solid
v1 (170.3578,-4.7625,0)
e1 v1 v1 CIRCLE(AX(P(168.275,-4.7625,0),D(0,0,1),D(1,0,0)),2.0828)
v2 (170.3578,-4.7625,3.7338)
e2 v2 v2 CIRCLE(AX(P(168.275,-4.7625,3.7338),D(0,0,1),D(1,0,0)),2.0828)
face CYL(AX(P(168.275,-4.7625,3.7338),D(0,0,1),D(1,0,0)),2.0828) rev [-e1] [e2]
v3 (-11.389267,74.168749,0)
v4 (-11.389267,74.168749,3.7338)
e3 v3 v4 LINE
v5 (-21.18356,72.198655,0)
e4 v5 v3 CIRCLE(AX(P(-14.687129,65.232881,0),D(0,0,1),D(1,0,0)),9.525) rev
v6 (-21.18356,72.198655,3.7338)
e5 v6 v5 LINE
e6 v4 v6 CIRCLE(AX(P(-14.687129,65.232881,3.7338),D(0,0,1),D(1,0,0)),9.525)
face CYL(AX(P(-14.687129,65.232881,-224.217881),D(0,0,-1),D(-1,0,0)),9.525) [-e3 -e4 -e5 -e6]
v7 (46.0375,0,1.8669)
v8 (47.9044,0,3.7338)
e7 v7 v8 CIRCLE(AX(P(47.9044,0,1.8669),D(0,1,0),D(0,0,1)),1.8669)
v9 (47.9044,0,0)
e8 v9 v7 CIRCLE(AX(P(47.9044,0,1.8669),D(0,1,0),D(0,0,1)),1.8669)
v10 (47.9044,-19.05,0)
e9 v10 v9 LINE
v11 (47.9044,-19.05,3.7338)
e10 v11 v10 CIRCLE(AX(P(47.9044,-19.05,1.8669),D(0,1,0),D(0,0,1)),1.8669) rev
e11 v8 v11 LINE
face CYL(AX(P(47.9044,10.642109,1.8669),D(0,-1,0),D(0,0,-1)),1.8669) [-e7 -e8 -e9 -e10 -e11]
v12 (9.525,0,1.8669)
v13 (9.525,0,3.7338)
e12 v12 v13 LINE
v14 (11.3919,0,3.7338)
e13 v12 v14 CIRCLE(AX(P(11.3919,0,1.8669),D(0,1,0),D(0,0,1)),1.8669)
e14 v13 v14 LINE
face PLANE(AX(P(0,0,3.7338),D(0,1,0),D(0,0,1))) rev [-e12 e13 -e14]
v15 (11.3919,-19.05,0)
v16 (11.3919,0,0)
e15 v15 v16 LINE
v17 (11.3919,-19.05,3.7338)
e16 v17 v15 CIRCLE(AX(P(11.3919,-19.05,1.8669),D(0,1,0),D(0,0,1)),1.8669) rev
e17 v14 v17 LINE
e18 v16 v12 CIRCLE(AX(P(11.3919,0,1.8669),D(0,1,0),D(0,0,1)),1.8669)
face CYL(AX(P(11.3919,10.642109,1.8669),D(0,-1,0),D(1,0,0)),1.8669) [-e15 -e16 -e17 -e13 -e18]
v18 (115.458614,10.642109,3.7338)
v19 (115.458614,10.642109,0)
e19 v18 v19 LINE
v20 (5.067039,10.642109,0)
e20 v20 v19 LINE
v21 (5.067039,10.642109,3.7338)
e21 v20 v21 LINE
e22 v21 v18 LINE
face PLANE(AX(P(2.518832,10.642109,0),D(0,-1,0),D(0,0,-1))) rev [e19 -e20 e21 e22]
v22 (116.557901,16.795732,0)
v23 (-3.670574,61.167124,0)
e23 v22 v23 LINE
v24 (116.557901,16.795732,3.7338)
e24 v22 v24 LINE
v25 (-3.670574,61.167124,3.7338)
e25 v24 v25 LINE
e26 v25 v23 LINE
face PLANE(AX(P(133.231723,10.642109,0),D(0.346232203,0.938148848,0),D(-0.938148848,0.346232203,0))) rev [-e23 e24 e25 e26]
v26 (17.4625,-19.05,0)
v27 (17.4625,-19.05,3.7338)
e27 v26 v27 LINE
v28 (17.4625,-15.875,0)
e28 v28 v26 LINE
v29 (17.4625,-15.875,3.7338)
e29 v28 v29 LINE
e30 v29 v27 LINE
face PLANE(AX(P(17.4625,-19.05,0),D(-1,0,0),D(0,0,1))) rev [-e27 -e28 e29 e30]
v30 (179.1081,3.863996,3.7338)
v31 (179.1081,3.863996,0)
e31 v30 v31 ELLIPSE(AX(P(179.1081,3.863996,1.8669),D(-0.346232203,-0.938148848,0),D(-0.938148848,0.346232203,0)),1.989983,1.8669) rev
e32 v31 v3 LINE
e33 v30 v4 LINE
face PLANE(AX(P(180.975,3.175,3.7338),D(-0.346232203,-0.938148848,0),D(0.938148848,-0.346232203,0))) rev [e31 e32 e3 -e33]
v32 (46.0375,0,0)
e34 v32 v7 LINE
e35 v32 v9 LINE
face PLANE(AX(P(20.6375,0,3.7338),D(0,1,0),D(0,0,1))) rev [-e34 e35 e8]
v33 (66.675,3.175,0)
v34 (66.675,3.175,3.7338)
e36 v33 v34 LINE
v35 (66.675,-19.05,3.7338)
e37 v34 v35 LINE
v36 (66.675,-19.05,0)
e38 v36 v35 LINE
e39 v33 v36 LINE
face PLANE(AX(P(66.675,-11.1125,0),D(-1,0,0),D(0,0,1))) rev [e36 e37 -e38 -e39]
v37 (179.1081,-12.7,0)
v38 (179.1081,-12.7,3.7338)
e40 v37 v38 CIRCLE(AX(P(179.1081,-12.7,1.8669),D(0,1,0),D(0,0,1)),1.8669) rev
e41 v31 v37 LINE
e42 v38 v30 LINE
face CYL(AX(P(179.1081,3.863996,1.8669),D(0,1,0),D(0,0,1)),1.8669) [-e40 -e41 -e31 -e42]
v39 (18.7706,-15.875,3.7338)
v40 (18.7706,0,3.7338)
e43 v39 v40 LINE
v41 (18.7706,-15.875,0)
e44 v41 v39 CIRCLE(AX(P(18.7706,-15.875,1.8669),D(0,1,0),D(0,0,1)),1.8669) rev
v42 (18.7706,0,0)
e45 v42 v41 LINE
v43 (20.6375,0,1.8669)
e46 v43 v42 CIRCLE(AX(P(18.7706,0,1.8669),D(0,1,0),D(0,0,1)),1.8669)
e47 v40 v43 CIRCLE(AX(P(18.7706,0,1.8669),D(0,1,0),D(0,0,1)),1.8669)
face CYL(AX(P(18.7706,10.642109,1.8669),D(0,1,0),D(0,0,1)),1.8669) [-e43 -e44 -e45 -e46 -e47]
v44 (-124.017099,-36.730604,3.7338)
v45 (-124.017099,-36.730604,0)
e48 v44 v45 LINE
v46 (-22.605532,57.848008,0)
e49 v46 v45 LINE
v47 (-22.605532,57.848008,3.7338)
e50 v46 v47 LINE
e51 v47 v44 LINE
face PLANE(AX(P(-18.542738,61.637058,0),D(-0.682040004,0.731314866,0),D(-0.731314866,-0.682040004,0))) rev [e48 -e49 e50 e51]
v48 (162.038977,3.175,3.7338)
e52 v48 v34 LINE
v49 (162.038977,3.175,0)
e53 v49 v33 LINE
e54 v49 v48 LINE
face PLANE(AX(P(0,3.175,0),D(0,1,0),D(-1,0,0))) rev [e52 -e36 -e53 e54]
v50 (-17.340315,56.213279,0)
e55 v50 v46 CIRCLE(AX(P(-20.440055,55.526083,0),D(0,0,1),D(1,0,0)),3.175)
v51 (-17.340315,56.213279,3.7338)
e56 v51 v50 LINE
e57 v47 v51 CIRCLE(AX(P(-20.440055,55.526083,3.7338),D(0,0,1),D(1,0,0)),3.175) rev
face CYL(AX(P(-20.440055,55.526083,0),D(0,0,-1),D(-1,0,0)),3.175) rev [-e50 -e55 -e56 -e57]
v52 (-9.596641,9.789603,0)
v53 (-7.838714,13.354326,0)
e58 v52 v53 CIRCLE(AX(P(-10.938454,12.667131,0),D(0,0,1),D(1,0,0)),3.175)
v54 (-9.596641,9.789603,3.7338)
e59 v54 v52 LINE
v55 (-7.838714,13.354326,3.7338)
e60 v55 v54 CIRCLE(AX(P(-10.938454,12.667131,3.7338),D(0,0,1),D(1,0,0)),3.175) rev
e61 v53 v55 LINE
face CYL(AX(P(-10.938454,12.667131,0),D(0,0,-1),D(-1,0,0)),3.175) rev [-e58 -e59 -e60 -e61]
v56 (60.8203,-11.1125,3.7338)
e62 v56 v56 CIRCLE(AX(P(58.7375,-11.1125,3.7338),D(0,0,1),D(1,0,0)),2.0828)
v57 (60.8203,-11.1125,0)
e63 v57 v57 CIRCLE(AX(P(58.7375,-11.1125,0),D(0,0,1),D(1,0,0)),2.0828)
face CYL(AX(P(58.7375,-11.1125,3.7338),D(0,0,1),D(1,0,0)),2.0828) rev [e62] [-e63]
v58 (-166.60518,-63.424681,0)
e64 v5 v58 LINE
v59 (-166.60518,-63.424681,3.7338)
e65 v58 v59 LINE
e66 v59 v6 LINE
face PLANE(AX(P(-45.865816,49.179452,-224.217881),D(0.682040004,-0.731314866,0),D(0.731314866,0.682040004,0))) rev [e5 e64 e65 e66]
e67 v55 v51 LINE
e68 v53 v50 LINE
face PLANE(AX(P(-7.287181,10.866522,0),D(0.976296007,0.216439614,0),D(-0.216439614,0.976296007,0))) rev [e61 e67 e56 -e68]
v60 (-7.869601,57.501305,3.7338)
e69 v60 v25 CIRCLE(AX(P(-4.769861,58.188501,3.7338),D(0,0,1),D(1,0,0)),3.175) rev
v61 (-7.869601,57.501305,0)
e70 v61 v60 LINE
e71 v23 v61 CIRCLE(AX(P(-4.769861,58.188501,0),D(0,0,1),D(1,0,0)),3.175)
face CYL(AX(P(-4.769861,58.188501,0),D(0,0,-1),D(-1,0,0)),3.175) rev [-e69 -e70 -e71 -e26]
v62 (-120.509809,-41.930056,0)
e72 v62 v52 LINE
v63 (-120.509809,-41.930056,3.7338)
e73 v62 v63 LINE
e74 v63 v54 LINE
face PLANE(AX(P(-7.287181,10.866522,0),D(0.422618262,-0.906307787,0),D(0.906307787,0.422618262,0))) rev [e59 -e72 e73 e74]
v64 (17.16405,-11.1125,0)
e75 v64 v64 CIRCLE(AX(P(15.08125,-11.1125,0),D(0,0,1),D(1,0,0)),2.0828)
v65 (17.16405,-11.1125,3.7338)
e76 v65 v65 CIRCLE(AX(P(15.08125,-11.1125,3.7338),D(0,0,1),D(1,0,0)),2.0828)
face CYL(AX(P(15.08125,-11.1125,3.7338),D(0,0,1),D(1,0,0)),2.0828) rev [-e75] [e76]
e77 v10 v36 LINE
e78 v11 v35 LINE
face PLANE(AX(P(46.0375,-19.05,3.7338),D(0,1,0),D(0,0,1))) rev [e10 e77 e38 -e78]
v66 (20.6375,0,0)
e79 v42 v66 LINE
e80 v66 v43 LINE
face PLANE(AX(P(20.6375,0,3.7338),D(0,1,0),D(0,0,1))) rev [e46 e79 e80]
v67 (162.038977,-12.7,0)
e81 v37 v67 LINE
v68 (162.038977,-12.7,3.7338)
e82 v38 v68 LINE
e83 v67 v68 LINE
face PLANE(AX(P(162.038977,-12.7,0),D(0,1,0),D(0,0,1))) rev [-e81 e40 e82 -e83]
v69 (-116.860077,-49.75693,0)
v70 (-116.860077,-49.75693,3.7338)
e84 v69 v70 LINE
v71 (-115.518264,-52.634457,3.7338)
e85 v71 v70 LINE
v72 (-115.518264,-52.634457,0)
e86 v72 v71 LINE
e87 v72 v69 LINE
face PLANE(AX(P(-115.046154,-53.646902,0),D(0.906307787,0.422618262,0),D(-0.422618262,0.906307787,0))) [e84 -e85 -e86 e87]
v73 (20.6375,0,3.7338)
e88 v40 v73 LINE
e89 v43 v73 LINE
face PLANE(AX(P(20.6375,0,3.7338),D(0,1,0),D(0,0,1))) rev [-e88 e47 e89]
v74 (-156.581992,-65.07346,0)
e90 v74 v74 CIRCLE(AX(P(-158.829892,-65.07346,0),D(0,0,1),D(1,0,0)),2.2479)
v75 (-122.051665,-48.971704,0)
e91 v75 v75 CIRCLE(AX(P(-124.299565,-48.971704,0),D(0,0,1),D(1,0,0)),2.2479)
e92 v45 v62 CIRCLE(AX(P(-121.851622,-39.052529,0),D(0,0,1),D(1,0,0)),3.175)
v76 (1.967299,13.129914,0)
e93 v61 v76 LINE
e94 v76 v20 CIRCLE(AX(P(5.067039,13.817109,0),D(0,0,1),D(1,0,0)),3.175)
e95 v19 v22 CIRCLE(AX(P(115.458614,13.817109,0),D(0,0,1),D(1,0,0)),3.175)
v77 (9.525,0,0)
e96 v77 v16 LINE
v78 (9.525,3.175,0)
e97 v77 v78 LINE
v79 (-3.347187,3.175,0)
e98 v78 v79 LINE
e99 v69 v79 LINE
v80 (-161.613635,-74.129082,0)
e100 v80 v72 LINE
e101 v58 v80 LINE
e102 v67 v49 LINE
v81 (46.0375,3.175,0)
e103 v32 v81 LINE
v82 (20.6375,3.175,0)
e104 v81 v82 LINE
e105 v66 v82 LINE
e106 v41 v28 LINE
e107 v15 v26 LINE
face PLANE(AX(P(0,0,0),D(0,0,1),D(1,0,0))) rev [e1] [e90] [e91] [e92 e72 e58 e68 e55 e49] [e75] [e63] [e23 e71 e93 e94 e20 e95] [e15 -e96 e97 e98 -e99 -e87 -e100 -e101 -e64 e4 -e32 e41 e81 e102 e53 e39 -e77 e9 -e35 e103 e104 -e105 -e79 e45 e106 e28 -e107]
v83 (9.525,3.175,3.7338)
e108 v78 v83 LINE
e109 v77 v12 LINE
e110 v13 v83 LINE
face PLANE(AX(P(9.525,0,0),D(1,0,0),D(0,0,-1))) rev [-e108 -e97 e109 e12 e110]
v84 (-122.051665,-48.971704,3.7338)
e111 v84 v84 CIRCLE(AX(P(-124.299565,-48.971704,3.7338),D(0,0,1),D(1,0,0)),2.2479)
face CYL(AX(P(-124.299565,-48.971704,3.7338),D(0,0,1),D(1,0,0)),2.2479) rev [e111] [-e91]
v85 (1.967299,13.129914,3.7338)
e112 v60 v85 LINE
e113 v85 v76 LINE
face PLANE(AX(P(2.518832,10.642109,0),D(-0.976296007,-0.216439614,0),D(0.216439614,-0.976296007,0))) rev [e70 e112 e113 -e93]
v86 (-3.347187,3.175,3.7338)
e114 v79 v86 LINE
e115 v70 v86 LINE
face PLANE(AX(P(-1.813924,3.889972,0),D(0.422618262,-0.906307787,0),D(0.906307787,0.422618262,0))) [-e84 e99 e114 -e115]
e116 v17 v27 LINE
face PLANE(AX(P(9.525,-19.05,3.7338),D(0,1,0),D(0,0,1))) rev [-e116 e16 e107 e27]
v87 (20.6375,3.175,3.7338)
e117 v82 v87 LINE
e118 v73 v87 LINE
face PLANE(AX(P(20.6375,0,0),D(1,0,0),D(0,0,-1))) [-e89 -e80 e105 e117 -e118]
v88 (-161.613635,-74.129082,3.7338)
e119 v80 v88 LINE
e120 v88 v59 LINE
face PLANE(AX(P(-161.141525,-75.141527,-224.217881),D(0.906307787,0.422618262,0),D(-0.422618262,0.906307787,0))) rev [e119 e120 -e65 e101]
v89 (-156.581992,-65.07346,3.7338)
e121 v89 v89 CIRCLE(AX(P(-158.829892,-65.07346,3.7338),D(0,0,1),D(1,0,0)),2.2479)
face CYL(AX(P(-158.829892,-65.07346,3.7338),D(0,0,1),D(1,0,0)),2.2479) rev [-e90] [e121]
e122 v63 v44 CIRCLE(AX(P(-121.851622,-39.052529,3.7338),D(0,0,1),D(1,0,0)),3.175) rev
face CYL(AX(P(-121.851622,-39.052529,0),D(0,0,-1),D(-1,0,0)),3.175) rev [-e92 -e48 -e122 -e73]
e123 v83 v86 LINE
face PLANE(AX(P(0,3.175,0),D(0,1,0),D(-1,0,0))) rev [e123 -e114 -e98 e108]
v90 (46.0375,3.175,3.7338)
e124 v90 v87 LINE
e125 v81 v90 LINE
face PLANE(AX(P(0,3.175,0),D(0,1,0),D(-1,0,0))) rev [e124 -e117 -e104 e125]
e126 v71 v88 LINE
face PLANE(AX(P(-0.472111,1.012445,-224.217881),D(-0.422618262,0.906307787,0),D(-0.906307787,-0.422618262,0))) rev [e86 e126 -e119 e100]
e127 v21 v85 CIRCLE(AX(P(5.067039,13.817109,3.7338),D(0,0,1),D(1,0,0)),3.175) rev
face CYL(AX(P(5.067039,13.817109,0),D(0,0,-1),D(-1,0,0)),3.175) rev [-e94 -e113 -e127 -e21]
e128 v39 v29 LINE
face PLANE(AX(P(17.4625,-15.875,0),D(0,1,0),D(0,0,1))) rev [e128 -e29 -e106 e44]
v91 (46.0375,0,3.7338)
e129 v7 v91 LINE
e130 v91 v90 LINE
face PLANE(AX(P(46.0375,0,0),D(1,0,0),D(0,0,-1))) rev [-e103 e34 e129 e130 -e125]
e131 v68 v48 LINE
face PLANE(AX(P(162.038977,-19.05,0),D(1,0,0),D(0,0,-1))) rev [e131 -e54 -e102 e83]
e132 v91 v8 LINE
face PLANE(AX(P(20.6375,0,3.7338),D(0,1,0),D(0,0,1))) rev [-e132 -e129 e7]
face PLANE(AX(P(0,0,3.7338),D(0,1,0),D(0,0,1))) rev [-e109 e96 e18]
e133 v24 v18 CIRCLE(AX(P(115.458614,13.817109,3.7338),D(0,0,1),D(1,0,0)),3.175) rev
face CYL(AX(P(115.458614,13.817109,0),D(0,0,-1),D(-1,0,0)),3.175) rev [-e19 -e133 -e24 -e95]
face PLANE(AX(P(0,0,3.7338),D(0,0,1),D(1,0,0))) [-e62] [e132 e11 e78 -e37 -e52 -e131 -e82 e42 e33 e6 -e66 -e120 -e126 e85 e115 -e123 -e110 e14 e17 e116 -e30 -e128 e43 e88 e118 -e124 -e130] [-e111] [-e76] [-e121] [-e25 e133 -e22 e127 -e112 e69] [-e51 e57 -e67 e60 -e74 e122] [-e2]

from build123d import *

# Parameters (mm, degrees)
BOSS_EXTRUDE1_DEPTH     = 3.7338
BOSS_EXTRUDE2_DEPTH     = 3.7338
CUT_EXTRUDE1_DEPTH      = 197.398400929
FILLET7_R               = 9.525
FILLET8_R               = 3.175
F_8_32_TAPPED_HOLE2_D   = 4.1656
FILLET3_RADIUS          = 1.8669
FILLET3_LENGTH          = 19.05
FILLET4_RADIUS          = 1.8669
FILLET4_LENGTH          = 19.05
FILLET5_RADIUS          = 1.8669
FILLET5_LENGTH          = 19.05
FILLET6_START           = -20
FILLET6_DEPTH           = 25
F_8_CLEARANCE_HOLE1_D   = 4.4958
CUT_EXTRUDE2_DEPTH      = 196.843388239
CUT_EXTRUDE3_DEPTH      = 196.843388239
SKETCH15_W              = 95.363977372
SKETCH15_H              = 7.9375
CUT_EXTRUDE4_DEPTH      = 196.843388239
SKETCH16_W              = 18.936022628
SKETCH16_H              = 6.35
CUT_EXTRUDE5_DEPTH      = 196.843388239
CUT_EXTRUDE6_DEPTH      = 196.843388239
CUT_EXTRUDE6_DEPTH_BACK = 196.843388239
SKETCH17_W              = 3.175
SKETCH17_H              = 3.175
SKETCH18_W              = 25.4
SKETCH18_H              = 3.175
CUT_EXTRUDE7_DEPTH      = 196.843388239


with BuildPart() as part:
    # Sketch1 → Boss-Extrude1 (new body)
    with BuildSketch(Plane.XY):
        Polygon((0, 0), (9.525, 0), (9.525, -19.05), (20.6375, -19.05), (20.6375, 0), (46.0375, 0), (46.0375, -19.05), (180.975, -19.05), (180.975, 3.175), (-16.893133293, 76.2), align=None)
    extrude(amount=BOSS_EXTRUDE1_DEPTH)

    # Sketch7 → Boss-Extrude2 (add)
    with BuildSketch(Plane.XY.offset(3.7338)):
        Polygon((-161.613635382, -74.129081959), (-0.247657199, 1.117109433), (-16.893133293, 76.2), (-166.605179671, -63.424680687), align=None)
    extrude(amount=-BOSS_EXTRUDE2_DEPTH)

    # Sketch8 → Cut-Extrude1 (cut, through all)
    with BuildSketch(Plane.XY.offset(3.7338)):
        Polygon((2.518832326, 10.642109433), (133.231722564, 10.642109433), (-9.128883742, 63.181561352), align=None)
        Polygon((-18.542737866, 61.637057548), (-138.674453357, -50.400369109), (-7.28718114, 10.86652211), align=None)
    extrude(amount=-CUT_EXTRUDE1_DEPTH, mode=Mode.SUBTRACT)

    # Fillet7
    fillet7_edges = [part.edges().sort_by_distance(p)[0] for p in [
        (-16.893133293, 76.2, 1.8669),
    ]]
    fillet(fillet7_edges, radius=FILLET7_R)

    # Fillet8
    fillet8_edges = [part.edges().sort_by_distance(p)[0] for p in [
        (-9.128883742, 63.181561352, 1.8669),
        (133.231722564, 10.642109433, 1.8669),
        (2.518832326, 10.642109433, 1.8669),
        (-7.28718114, 10.86652211, 1.8669),
        (-138.674453357, -50.400369109, 1.8669),
        (-18.542737866, 61.637057548, 1.8669),
    ]]
    fillet(fillet8_edges, radius=FILLET8_R)

    # #8-32 Tapped Hole2 (through all)
    with Locations(Plane.XY.offset(3.7338)):
        with Locations((15.08125, -11.1125), (58.7375, -11.1125), (168.275, -4.7625)):
            Hole(F_8_32_TAPPED_HOLE2_D / 2)

    # Fillet3: full round fillet: the end face becomes a half cylinder, R = half its width
    fillet3_face = Plane((9.525, -9.525, 1.8669), x_dir=(0, 1, 0), z_dir=(-1, 0, 0))  # on the end face: x along it, z out of the body
    fillet3_slab = fillet3_face.offset(-FILLET3_RADIUS / 2) * Box(FILLET3_LENGTH, 2 * FILLET3_RADIUS, FILLET3_RADIUS, mode=Mode.PRIVATE)  # the body's end, R deep
    fillet3_round = Plane((11.3919, -9.525, 1.8669), x_dir=(-1, 0, 0), z_dir=(0, 1, 0)) * Cylinder(FILLET3_RADIUS, FILLET3_LENGTH, mode=Mode.PRIVATE)  # its axis R under the face
    add(fillet3_slab - fillet3_round, mode=Mode.SUBTRACT)

    # Fillet4: full round fillet: the end face becomes a half cylinder, R = half its width
    fillet4_face = Plane((20.6375, -9.525, 1.8669), x_dir=(0, 1, 0), z_dir=(1, 0, 0))  # on the end face: x along it, z out of the body
    fillet4_slab = fillet4_face.offset(-FILLET4_RADIUS / 2) * Box(FILLET4_LENGTH, 2 * FILLET4_RADIUS, FILLET4_RADIUS, mode=Mode.PRIVATE)  # the body's end, R deep
    fillet4_round = Plane((18.7706, -9.525, 1.8669), x_dir=(1, 0, 0), z_dir=(0, 1, 0)) * Cylinder(FILLET4_RADIUS, FILLET4_LENGTH, mode=Mode.PRIVATE)  # its axis R under the face
    add(fillet4_slab - fillet4_round, mode=Mode.SUBTRACT)

    # Fillet5: full round fillet: the end face becomes a half cylinder, R = half its width
    fillet5_face = Plane((46.0375, -9.525, 1.8669), x_dir=(0, -1, 0), z_dir=(-1, 0, 0))  # on the end face: x along it, z out of the body
    fillet5_slab = fillet5_face.offset(-FILLET5_RADIUS / 2) * Box(FILLET5_LENGTH, 2 * FILLET5_RADIUS, FILLET5_RADIUS, mode=Mode.PRIVATE)  # the body's end, R deep
    fillet5_round = Plane((47.9044, -9.525, 1.8669), x_dir=(-1, 0, 0), z_dir=(0, -1, 0)) * Cylinder(FILLET5_RADIUS, FILLET5_LENGTH, mode=Mode.PRIVATE)  # its axis R under the face
    add(fillet5_slab - fillet5_round, mode=Mode.SUBTRACT)

    # Fillet6: read off the stored shape, not the designer's step
    # Fillet6 outline → Fillet6 (cut)
    with BuildSketch(Plane(origin=(0, 0, 0), x_dir=(1, 0, 0), z_dir=(0, 1, 0)).offset(FILLET6_START)):
        with BuildLine():
            ThreePointArc((179.1081, 0), (180.42819765, -0.54680235), (180.975, -1.8669))
            Line((180.975, -1.8669), (180.975, 0))
            Line((180.975, 0), (179.1081, 0))
        make_face()
        with BuildLine():
            ThreePointArc((180.975, -1.8669), (180.42819765, -3.18699765), (179.1081, -3.7338))
            Line((179.1081, -3.7338), (180.975, -3.7338))
            Line((180.975, -3.7338), (180.975, -1.8669))
        make_face()
    extrude(amount=FILLET6_DEPTH, mode=Mode.SUBTRACT)

    # #8 Clearance Hole1 (through all)
    with Locations(Plane.XY.offset(3.7338)):
        with Locations((-158.829891599, -65.073459713), (-124.299564913, -48.97170394)):
            Hole(F_8_CLEARANCE_HOLE1_D / 2)

    # Sketch12 → Cut-Extrude2 (cut, through all)
    with BuildSketch(Plane.XY.offset(3.7338)):
        Polygon((-0.247657199, 1.117109433), (0, 1.232593882), (0, 0), align=None)
    extrude(amount=-CUT_EXTRUDE2_DEPTH, mode=Mode.SUBTRACT)

    # Sketch14 → Cut-Extrude3 (cut, through all)
    with BuildSketch(Plane.XY.offset(3.7338)):
        with BuildLine():
            Line((71.4375, -6.35), (157.276477372, -6.35))
            ThreePointArc((157.276477372, -6.35), (162.038977372, -11.1125), (157.276477372, -15.875))
            Line((157.276477372, -15.875), (71.4375, -15.875))
            ThreePointArc((71.4375, -15.875), (66.675, -11.1125), (71.4375, -6.35))
        make_face()
    extrude(amount=-CUT_EXTRUDE3_DEPTH, mode=Mode.SUBTRACT)

    # Sketch15 → Cut-Extrude4 (cut, through all)
    with BuildSketch(Plane.XY.offset(3.7338)):
        with Locations((114.356988686, -15.08125)):
            Rectangle(SKETCH15_W, SKETCH15_H)
    extrude(amount=-CUT_EXTRUDE4_DEPTH, mode=Mode.SUBTRACT)

    # Sketch16 → Cut-Extrude5 (cut, through all)
    with BuildSketch(Plane.XY.offset(3.7338)):
        with Locations((171.506988686, -15.875)):
            Rectangle(SKETCH16_W, SKETCH16_H)
    extrude(amount=-CUT_EXTRUDE5_DEPTH, mode=Mode.SUBTRACT)

    # Sketch17 → Cut-Extrude6 (cut, two sides: drawn at the far end of the back side and taken through both)
    with BuildSketch(Plane.XY.offset(3.7338).offset(-CUT_EXTRUDE6_DEPTH_BACK)):
        with Locations((19.05, -17.4625)):
            Rectangle(SKETCH17_W, SKETCH17_H)
    extrude(amount=CUT_EXTRUDE6_DEPTH + CUT_EXTRUDE6_DEPTH_BACK, mode=Mode.SUBTRACT)

    # Sketch18 → Cut-Extrude7 (cut, through all)
    with BuildSketch(Plane.XY.offset(3.7338)):
        Polygon((-3.347186663, 3.175), (-2.005373682, 0.297472776), (0, 1.232593882), (0, 0), (9.525, 0), (9.525, 3.175), align=None)
        Polygon((-116.86007736, -49.756930231), (-115.518264379, -52.634457455), (-2.005373682, 0.297472776), (-3.347186663, 3.175), align=None)
        with Locations((33.3375, 1.5875)):
            Rectangle(SKETCH18_W, SKETCH18_H)
        with BuildLine():
            ThreePointArc((157.276477372, -6.35), (160.644073417, -7.744903955), (162.038977372, -11.1125))
            Line((162.038977372, -11.1125), (162.038977372, 3.175))
            Line((162.038977372, 3.175), (66.675, 3.175))
            Line((66.675, 3.175), (66.675, -11.1125))
            ThreePointArc((66.675, -11.1125), (68.069903955, -7.744903955), (71.4375, -6.35))
            Line((71.4375, -6.35), (157.276477372, -6.35))
        make_face()
    extrude(amount=-CUT_EXTRUDE7_DEPTH, mode=Mode.SUBTRACT)


solid = part.part
